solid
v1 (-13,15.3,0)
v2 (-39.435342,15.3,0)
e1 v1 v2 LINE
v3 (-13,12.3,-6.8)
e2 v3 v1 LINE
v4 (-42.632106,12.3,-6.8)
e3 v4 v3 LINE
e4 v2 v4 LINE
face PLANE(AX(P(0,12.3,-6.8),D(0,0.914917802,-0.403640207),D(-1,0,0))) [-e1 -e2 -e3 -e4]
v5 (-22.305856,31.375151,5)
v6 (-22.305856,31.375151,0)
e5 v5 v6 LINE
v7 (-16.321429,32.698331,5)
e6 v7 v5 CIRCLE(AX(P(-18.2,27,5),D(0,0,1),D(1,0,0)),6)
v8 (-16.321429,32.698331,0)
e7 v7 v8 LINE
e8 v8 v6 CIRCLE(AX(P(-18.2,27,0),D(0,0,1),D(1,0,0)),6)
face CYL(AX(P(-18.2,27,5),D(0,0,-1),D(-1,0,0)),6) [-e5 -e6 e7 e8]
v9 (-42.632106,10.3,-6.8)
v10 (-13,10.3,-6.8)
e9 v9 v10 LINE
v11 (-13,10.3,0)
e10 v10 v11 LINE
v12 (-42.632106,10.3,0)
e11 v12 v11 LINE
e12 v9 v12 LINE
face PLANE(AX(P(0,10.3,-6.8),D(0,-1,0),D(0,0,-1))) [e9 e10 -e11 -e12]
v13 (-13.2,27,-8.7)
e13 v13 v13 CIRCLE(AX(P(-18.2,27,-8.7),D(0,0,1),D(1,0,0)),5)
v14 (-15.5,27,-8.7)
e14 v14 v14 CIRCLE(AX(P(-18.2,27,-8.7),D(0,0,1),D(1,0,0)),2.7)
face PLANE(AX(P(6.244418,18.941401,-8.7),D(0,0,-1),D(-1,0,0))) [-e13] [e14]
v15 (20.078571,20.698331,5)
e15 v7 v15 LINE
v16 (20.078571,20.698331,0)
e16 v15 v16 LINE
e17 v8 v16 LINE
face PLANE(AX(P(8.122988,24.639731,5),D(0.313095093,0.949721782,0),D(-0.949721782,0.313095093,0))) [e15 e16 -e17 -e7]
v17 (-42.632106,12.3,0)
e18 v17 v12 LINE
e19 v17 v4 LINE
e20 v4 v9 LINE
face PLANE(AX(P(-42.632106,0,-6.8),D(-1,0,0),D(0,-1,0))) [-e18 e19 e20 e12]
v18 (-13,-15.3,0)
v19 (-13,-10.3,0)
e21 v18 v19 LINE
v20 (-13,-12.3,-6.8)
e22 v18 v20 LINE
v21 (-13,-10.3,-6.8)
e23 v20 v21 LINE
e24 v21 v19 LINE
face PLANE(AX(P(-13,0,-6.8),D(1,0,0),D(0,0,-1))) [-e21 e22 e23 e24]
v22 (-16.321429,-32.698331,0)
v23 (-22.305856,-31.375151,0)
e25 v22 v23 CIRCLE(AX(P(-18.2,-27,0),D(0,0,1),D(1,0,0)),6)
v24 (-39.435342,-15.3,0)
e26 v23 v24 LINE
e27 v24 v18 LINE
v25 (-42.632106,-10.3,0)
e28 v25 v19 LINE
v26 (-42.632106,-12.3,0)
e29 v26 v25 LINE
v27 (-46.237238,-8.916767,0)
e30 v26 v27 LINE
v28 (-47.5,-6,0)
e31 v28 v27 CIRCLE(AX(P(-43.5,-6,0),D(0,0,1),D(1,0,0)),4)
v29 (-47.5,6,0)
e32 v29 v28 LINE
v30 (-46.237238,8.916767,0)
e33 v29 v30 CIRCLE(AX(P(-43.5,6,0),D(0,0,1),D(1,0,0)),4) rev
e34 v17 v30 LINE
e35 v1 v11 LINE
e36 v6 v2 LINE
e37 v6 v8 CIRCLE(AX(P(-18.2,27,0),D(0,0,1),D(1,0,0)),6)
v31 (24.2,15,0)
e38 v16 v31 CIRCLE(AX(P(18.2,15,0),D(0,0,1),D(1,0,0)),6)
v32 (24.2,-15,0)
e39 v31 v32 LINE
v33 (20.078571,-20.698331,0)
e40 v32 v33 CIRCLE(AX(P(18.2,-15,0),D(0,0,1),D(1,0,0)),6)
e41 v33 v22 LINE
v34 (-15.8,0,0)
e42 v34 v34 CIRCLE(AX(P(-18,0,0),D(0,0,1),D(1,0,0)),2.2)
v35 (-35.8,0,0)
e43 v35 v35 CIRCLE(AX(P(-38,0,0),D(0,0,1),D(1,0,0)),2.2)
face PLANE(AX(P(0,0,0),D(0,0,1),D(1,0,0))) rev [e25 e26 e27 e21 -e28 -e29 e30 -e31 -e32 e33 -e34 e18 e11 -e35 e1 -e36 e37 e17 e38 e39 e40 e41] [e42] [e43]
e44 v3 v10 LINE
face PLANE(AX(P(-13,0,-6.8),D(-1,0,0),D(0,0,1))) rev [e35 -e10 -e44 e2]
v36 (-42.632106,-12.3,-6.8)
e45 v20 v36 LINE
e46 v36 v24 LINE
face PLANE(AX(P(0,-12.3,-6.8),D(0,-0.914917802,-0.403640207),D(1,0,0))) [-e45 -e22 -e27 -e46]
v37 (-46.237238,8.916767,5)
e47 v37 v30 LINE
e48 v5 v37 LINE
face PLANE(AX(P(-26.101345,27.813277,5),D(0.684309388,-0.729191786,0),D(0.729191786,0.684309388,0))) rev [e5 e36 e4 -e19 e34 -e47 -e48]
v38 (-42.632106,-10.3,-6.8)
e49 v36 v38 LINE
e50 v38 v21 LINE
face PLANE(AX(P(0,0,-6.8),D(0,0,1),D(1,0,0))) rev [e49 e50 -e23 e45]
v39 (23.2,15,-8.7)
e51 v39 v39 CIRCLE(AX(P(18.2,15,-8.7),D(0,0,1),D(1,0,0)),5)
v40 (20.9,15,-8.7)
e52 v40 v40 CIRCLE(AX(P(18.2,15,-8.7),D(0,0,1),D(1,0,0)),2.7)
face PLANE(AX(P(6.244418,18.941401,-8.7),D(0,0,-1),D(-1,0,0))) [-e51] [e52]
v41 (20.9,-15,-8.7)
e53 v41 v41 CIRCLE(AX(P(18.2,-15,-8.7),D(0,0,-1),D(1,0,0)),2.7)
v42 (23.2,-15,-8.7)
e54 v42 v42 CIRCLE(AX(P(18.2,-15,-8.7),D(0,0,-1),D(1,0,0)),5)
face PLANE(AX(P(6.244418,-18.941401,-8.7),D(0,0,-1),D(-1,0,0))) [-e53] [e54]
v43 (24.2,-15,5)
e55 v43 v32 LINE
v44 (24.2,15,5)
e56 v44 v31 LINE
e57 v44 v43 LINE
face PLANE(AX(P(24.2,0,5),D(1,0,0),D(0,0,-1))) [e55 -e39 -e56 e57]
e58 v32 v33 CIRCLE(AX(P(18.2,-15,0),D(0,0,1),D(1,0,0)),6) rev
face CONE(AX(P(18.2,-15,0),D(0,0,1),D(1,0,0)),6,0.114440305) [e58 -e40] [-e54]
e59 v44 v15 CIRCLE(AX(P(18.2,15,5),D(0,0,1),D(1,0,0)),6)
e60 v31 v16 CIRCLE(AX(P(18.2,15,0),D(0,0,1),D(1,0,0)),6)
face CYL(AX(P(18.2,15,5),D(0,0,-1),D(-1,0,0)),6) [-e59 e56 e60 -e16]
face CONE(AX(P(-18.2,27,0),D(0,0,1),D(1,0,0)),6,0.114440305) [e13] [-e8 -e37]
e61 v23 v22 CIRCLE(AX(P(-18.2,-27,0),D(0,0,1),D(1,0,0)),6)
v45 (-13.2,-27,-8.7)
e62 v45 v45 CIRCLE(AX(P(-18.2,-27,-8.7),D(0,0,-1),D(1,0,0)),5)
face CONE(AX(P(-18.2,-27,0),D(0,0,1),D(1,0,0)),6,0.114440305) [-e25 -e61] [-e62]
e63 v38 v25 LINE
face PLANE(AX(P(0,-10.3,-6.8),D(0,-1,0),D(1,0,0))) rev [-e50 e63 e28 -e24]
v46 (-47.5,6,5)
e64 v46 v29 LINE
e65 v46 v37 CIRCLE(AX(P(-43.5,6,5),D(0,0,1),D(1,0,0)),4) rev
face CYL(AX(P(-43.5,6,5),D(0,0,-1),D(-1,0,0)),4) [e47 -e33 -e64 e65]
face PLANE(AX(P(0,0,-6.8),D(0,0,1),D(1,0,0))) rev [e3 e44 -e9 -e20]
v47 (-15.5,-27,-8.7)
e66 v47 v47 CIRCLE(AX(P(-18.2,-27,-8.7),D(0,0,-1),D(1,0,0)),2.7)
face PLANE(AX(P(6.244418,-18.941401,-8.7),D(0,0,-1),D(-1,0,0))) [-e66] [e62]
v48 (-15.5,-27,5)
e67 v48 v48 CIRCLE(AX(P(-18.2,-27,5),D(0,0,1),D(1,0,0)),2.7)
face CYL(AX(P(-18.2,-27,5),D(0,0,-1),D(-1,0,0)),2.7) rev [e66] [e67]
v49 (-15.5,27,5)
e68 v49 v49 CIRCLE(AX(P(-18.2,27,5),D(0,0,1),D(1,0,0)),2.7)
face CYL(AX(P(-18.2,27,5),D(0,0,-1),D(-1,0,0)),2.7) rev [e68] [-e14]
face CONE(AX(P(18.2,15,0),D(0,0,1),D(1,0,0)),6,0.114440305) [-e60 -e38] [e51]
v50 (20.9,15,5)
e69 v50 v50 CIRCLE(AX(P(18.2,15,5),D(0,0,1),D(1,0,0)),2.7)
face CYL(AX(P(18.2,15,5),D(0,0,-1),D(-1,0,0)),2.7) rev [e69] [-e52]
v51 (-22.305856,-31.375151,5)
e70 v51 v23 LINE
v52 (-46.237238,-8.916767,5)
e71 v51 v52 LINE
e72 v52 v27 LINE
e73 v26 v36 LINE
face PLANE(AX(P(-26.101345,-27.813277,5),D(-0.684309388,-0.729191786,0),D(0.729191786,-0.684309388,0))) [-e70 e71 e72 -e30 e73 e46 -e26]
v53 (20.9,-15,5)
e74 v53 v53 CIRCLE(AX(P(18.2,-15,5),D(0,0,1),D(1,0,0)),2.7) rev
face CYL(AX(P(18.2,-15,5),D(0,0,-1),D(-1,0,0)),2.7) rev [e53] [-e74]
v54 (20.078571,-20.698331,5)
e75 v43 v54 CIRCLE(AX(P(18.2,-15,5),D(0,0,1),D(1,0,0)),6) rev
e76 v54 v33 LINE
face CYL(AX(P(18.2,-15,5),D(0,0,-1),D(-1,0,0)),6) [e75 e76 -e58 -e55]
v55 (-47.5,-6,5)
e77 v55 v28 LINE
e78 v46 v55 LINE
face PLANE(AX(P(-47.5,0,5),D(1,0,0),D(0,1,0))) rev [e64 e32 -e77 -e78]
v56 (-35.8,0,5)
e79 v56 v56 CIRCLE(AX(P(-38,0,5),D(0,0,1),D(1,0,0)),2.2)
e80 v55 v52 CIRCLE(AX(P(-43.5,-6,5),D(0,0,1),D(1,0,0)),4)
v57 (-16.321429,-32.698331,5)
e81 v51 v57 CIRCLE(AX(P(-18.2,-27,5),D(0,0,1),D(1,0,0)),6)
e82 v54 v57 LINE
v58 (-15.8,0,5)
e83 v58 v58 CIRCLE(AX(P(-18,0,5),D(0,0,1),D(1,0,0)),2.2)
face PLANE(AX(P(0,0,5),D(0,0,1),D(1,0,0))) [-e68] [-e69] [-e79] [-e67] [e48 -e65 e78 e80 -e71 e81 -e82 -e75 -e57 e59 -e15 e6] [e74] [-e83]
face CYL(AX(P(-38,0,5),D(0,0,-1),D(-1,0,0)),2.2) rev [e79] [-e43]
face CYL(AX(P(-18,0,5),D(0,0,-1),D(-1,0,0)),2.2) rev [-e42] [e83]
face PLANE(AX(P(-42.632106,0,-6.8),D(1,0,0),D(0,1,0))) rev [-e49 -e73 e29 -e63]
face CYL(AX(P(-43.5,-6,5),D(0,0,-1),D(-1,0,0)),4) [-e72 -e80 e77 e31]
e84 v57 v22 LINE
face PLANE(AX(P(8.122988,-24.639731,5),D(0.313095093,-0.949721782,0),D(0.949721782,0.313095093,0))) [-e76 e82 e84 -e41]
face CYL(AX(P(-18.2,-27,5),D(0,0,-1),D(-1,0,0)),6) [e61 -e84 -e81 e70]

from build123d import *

# Parameters (mm, degrees)
SKETCH_1_R       = 2.7
SKETCH_1_R_2     = 2.2
EXTRUDE_1_DEPTH  = 5
SKETCH_1_4_W     = 29.632105645
SKETCH_1_4_H     = 2
EXTRUDE_2_DEPTH  = 6.8
CHAMFER_1_SIZE   = 3
CHAMFER_1_SIZE_2 = 6.8
CHAMFER_2_SIZE   = 3
CHAMFER_2_SIZE_2 = 6.8


with BuildPart() as part:
    # 草图1 → 凸台-拉伸1 (new body)
    with BuildSketch(Plane.XY):
        with BuildLine():
            Line((-22.305856328, 31.375150719), (-46.237237552, 8.916767146))
            ThreePointArc((-46.237237552, 8.916767146), (-47.170759472, 7.589190013), (-47.5, 6))
            Line((-47.5, 6), (-47.5, -6))
            ThreePointArc((-47.5, -6), (-47.170759472, -7.589190013), (-46.237237552, -8.916767146))
            Line((-46.237237552, -8.916767146), (-22.305856328, -31.375150719))
            ThreePointArc((-22.305856328, -31.375150719), (-19.495338483, -32.858506483), (-16.321429443, -32.698330691))
            Line((-16.321429443, -32.698330691), (20.078570557, -20.698330691))
            ThreePointArc((20.078570557, -20.698330691), (23.061657297, -18.516288999), (24.2, -15))
            Line((24.2, -15), (24.2, 15))
            ThreePointArc((24.2, 15), (23.061657297, 18.516288999), (20.078570557, 20.698330691))
            Line((20.078570557, 20.698330691), (-16.321429443, 32.698330691))
            ThreePointArc((-16.321429443, 32.698330691), (-19.495338483, 32.858506483), (-22.305856328, 31.375150719))
        make_face()
        with Locations((18.2, -15)):
            Circle(SKETCH_1_R, mode=Mode.SUBTRACT)
        with Locations((-38, 0)):
            Circle(SKETCH_1_R_2, mode=Mode.SUBTRACT)
        with Locations((-18, 0)):
            Circle(SKETCH_1_R_2, mode=Mode.SUBTRACT)
        with Locations((-18.2, 27)):
            Circle(SKETCH_1_R, mode=Mode.SUBTRACT)
        with Locations((18.2, 15)):
            Circle(SKETCH_1_R, mode=Mode.SUBTRACT)
        with Locations((-18.2, -27)):
            Circle(SKETCH_1_R, mode=Mode.SUBTRACT)
    extrude(amount=EXTRUDE_1_DEPTH)

    # 草图4 → 旋转1 (revolve)
    with BuildSketch(Plane(origin=(6.244417819, 18.941400719, 0), x_dir=(-0.9497217817885489, 0.3130950928973239, 0), z_dir=(-0.3130950928973239, -0.9497217817885489, 0)), mode=Mode.PRIVATE) as revolve_1_sk:
        Polygon((-6.588510035, 0), (-7.588510035, 8.7), (-9.888510035, 8.7), (-9.888510035, 0), align=None)
    revolve_1 = revolve(revolve_1_sk.sketch.rotate(Axis((18.2, 15, 4.45283877), (0, 0, -1)), 161.754145472), axis=Axis((18.2, 15, 4.45283877), (0, 0, -1)))

    # 草图4<3> → 旋转2 (revolve)
    with BuildSketch(Plane(origin=(6.244417819, 18.941400719, 0), x_dir=(-0.9497217817885489, 0.3130950928973239, 0), z_dir=(-0.3130950928973239, -0.9497217817885489, 0)), mode=Mode.PRIVATE) as revolve_2_sk:
        Polygon((30.738503937, 8.7), (28.438503937, 8.7), (28.438503937, 0), (31.738503937, 0), align=None)
    revolve_2 = revolve(revolve_2_sk.sketch.rotate(Axis((-18.2, 27, 0), (0, 0, -1)), 161.754145472), axis=Axis((-18.2, 27, 0), (0, 0, -1)))

    # 镜向1: 旋转1, 旋转2 across plane
    add(revolve_1.mirror(Plane.ZX))
    add(revolve_2.mirror(Plane.ZX))

    # 草图1<4> → 凸台-拉伸2 (add)
    with BuildSketch(Plane.XY):
        with Locations((-27.816052823, 11.3)):
            Rectangle(SKETCH_1_4_W, SKETCH_1_4_H)
        with Locations((-27.816052823, -11.3)):
            Rectangle(SKETCH_1_4_W, SKETCH_1_4_H)
    extrude(amount=-EXTRUDE_2_DEPTH)

    # 倒角1
    # the kernel refuses this chamfer: 6.8, 3 mm, written as the material it adds along each edge
    with BuildSketch(Plane(origin=(-13, 12.3, 0), x_dir=(0, 0.9968133817371192, 0.07976892872421078), z_dir=(-1, 0, 0))) as chamfer_1_piece_1_section:
        Polygon((CHAMFER_1_SIZE * 0.996813381737, CHAMFER_1_SIZE * 0.0797689287242), (-CHAMFER_1_SIZE_2 * 0.0797689287242, CHAMFER_1_SIZE_2 * 0.996813381737), (0, 0), align=None)
    chamfer_1_piece_1 = extrude(amount=29.632105645, mode=Mode.PRIVATE)
    chamfer_1_piece_1 = split(chamfer_1_piece_1, bisect_by=Plane(origin=(-34.029834246, 20.372793997, -2.314232385), z_dir=(0.6843093880009448, -0.7291917864963733, 0)), keep=Keep.TOP, mode=Mode.PRIVATE)
    chamfer_1_piece_1 = split(chamfer_1_piece_1, bisect_by=Plane(origin=(-27.32033499, 13.223232944, -6.8), z_dir=(0, 0, 1)), keep=Keep.TOP, mode=Mode.PRIVATE)
    add(chamfer_1_piece_1)

    # 倒角2
    # the kernel refuses this chamfer: 6.8, 3 mm, written as the material it adds along each edge
    with BuildSketch(Plane(origin=(-42.632105645, -12.3, 0), x_dir=(0, -0.9968133817371192, 0.07976892872421078), z_dir=(1, 0, 0))) as chamfer_2_piece_1_section:
        Polygon((CHAMFER_2_SIZE * 0.996813381737, CHAMFER_2_SIZE * 0.0797689287242), (-CHAMFER_2_SIZE_2 * 0.0797689287242, CHAMFER_2_SIZE_2 * 0.996813381737), (0, 0), align=None)
    chamfer_2_piece_1 = extrude(amount=29.632105645, mode=Mode.PRIVATE)
    chamfer_2_piece_1 = split(chamfer_2_piece_1, bisect_by=Plane(origin=(-34.029834246, -20.372793997, -2.314232385), z_dir=(0.6843093880009445, 0.7291917864963735, 0)), keep=Keep.TOP, mode=Mode.PRIVATE)
    chamfer_2_piece_1 = split(chamfer_2_piece_1, bisect_by=Plane(origin=(-27.32033499, -13.223232944, -6.8), z_dir=(0, 0, 1)), keep=Keep.TOP, mode=Mode.PRIVATE)
    add(chamfer_2_piece_1)


solid = part.part
